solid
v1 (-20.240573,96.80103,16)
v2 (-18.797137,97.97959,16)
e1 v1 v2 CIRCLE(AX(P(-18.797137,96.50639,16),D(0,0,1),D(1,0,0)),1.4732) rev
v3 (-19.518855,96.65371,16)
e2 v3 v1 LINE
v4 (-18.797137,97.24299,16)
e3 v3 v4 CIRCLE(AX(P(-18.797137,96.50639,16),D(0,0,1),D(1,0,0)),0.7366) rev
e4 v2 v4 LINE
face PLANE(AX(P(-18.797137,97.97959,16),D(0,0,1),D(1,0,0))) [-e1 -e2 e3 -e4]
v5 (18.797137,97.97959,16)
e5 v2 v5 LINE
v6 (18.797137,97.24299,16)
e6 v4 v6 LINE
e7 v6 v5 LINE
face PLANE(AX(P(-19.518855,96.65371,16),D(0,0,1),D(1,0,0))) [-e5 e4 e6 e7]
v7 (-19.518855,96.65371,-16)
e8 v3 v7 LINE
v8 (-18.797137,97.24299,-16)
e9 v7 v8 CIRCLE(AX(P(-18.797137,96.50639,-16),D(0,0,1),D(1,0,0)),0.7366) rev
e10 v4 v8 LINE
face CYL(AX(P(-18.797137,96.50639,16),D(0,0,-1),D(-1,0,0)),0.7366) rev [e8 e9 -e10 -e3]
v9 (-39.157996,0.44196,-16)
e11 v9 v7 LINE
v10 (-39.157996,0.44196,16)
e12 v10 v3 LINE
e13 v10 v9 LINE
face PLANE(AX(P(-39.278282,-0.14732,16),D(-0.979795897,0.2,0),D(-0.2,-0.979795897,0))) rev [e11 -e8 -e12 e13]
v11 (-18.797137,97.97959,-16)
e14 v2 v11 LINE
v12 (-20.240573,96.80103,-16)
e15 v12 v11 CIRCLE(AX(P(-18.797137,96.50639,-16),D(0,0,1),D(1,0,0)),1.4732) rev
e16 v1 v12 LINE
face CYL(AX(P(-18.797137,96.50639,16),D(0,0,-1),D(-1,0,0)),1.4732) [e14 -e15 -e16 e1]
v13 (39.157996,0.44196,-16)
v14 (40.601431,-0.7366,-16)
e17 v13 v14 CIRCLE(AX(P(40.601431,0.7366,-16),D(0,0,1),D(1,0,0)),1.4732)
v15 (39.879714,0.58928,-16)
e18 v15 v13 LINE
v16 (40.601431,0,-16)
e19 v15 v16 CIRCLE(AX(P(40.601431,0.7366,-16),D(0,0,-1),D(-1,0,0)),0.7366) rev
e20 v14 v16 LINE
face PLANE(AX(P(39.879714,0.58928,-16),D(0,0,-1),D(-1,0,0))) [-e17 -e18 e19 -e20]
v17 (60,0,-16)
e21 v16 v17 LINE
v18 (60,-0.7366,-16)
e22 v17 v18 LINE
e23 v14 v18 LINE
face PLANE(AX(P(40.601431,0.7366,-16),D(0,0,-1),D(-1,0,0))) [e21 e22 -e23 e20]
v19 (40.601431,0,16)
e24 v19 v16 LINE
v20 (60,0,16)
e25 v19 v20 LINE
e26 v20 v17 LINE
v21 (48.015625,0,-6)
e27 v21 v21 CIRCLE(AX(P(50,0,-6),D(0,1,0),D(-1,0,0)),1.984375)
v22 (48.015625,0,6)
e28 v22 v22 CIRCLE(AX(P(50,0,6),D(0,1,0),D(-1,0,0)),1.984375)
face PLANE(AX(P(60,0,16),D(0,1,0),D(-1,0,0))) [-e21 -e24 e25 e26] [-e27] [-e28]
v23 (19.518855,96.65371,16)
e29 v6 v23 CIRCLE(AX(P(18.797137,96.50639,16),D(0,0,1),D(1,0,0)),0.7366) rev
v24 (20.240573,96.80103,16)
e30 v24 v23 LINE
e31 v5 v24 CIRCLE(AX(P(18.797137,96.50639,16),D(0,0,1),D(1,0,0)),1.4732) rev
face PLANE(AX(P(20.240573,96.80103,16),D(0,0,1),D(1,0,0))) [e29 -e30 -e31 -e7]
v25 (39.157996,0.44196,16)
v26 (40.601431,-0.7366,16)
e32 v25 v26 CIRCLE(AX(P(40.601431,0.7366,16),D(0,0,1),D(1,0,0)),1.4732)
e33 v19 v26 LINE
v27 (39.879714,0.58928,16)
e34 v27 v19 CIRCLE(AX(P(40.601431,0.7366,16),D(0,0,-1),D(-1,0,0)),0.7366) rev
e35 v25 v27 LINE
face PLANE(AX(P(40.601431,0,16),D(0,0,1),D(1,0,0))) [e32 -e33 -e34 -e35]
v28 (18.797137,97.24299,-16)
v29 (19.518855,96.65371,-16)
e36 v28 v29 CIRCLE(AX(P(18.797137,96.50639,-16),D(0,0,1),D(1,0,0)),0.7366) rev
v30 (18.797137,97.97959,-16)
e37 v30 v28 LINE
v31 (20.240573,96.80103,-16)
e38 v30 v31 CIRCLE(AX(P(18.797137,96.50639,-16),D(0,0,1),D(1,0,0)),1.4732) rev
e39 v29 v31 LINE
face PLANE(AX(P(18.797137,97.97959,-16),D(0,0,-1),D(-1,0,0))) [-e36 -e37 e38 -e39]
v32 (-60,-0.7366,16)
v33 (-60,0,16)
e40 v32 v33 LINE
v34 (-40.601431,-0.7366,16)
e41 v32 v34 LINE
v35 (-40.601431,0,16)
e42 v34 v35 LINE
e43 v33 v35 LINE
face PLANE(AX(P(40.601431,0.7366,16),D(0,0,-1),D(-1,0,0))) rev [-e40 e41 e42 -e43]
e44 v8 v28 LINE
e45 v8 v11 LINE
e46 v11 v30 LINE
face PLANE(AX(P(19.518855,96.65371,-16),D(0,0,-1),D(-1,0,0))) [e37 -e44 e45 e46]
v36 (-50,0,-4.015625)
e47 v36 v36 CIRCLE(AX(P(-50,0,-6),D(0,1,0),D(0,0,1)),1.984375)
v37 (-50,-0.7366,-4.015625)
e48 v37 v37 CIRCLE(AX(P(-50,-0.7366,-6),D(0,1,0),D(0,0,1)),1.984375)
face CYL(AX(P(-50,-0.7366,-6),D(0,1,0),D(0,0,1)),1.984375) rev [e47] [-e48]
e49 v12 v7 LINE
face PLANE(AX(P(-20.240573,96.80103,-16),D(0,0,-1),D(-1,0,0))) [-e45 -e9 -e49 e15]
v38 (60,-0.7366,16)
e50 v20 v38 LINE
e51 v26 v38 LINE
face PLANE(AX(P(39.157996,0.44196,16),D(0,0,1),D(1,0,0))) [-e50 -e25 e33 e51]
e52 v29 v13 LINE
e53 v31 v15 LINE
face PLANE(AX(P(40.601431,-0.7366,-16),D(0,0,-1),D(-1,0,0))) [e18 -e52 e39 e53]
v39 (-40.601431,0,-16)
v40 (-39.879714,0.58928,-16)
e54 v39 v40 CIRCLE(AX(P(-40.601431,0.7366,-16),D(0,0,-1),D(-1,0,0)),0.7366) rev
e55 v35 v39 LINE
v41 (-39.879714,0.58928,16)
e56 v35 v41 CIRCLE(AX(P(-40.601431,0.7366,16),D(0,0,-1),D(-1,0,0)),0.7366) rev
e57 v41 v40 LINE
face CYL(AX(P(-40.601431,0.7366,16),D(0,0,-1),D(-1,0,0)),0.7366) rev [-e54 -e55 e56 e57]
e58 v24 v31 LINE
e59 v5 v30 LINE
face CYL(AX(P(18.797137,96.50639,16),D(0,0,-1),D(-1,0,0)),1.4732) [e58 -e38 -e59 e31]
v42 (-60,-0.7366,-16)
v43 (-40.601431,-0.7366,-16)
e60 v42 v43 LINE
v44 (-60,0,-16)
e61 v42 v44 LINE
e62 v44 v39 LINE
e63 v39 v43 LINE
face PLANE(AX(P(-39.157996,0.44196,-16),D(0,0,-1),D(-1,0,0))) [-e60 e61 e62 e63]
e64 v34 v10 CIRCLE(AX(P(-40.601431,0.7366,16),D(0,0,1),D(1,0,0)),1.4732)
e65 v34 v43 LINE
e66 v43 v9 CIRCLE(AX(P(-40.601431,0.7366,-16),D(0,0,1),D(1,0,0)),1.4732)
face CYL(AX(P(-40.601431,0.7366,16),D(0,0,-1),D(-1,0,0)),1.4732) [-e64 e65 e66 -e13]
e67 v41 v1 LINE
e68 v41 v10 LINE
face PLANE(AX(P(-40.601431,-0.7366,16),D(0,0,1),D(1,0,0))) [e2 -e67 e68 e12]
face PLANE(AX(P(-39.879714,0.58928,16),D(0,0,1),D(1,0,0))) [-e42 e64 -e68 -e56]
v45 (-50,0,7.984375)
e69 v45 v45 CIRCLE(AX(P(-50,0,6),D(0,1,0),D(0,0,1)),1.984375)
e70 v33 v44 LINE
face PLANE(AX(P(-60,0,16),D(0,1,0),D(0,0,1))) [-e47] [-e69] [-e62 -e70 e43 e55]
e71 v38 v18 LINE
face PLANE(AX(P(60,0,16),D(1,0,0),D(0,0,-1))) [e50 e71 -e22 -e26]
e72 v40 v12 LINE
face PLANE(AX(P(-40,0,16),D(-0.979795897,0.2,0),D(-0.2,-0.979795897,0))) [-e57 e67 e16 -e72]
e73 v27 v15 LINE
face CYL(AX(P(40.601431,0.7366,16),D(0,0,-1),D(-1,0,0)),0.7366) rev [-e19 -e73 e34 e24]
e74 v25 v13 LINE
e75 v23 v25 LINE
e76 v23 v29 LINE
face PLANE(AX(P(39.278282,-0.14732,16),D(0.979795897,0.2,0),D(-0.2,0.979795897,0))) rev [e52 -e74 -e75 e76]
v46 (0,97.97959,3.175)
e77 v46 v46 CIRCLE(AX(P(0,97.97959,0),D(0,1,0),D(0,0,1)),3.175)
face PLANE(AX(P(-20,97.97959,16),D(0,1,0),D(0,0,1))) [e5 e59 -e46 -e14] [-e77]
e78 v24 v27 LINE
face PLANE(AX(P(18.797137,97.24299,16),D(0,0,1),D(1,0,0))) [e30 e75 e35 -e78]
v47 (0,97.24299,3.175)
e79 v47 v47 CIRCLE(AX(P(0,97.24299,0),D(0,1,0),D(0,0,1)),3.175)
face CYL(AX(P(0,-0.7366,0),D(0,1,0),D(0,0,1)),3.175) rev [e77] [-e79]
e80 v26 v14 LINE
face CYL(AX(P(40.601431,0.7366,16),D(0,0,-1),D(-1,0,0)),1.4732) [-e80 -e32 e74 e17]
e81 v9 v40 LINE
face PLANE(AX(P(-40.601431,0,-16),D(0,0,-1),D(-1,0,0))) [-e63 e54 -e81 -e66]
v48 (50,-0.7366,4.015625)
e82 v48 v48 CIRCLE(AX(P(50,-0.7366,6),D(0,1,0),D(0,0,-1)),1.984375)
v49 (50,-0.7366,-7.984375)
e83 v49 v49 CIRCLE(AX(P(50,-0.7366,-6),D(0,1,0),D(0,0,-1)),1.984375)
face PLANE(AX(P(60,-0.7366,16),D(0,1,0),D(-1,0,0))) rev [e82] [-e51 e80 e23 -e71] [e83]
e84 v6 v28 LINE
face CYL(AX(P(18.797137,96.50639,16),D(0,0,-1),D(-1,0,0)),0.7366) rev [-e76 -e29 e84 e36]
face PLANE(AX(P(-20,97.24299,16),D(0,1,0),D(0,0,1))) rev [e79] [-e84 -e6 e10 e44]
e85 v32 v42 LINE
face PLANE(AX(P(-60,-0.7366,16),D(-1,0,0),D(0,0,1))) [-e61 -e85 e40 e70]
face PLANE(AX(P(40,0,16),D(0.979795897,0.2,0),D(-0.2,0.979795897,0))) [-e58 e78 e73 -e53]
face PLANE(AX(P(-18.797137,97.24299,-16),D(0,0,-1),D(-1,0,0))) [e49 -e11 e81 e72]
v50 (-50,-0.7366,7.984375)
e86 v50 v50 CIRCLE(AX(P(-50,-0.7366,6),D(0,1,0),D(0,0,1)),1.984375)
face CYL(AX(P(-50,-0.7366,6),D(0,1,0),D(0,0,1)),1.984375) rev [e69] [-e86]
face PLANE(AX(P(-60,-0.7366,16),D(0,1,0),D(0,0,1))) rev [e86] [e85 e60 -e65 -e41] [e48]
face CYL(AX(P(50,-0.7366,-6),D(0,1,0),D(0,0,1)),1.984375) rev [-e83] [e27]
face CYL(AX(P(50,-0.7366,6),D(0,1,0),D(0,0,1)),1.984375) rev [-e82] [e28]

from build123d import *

# Parameters (mm, degrees)
BASE_FLANGE1_DEPTH = 16
SKETCH6_R          = 1.984375
SKETCH6_R_2        = 3.175
CUT_EXTRUDE1_DEPTH = 117.622837005


# Sheet-metal steps are written as plain solids
with BuildPart() as part:
    # Sketch1 → Base-Flange1 (new, symmetric)
    with BuildSketch(Plane.XY):
        with BuildLine():
            Line((-60, 0), (-40.601431382, 0))
            ThreePointArc((-40.601431382, 0), (-40.135564637, 0.166032093), (-39.879713724, 0.58928))
            Line((-39.879713724, 0.58928), (-20.240572553, 96.801029711))
            ThreePointArc((-20.240572553, 96.801029711), (-19.728870727, 97.647525524), (-18.797137237, 97.979589711))
            Line((-18.797137237, 97.979589711), (18.797137237, 97.979589711))
            ThreePointArc((18.797137237, 97.979589711), (19.728870727, 97.647525524), (20.240572553, 96.801029711))
            Line((20.240572553, 96.801029711), (39.879713724, 0.58928))
            ThreePointArc((39.879713724, 0.58928), (40.135564637, 0.166032093), (40.601431382, 0))
            Line((40.601431382, 0), (60, 0))
            Line((60, 0), (60, -0.7366))
            Line((60, -0.7366), (40.601431382, -0.7366))
            ThreePointArc((40.601431382, -0.7366), (39.669697892, -0.404535813), (39.157996066, 0.44196))
            Line((39.157996066, 0.44196), (19.518854895, 96.653709711))
            ThreePointArc((19.518854895, 96.653709711), (19.263003982, 97.076957618), (18.797137237, 97.242989711))
            Line((18.797137237, 97.242989711), (-18.797137237, 97.242989711))
            ThreePointArc((-18.797137237, 97.242989711), (-19.263003982, 97.076957618), (-19.518854895, 96.653709711))
            Line((-19.518854895, 96.653709711), (-39.157996066, 0.44196))
            ThreePointArc((-39.157996066, 0.44196), (-39.669697892, -0.404535813), (-40.601431382, -0.7366))
            Line((-40.601431382, -0.7366), (-60, -0.7366))
            Line((-60, -0.7366), (-60, 0))
        make_face()
    extrude(amount=BASE_FLANGE1_DEPTH, both=True)

    # Sketch6 → Cut-Extrude1 (cut, through all)
    with BuildSketch(Plane(origin=(0, 97.979589711, 0), x_dir=(1, 0, 0), z_dir=(0, 1, 0))):
        with Locations(Location((-50, 6, 0), (0, 0, 270))):
            Circle(SKETCH6_R)
        with Locations(Location((-50, -6, 0), (0, 0, 270))):
            Circle(SKETCH6_R)
        with Locations(Location((0, 0, 0), (0, 0, 270))):
            Circle(SKETCH6_R_2)
        with Locations(Location((50, -6, 0), (0, 0, 180))):
            Circle(SKETCH6_R)
        with Locations(Location((50, 6, 0), (0, 0, 180))):
            Circle(SKETCH6_R)
    extrude(amount=-CUT_EXTRUDE1_DEPTH, mode=Mode.SUBTRACT)


solid = part.part
